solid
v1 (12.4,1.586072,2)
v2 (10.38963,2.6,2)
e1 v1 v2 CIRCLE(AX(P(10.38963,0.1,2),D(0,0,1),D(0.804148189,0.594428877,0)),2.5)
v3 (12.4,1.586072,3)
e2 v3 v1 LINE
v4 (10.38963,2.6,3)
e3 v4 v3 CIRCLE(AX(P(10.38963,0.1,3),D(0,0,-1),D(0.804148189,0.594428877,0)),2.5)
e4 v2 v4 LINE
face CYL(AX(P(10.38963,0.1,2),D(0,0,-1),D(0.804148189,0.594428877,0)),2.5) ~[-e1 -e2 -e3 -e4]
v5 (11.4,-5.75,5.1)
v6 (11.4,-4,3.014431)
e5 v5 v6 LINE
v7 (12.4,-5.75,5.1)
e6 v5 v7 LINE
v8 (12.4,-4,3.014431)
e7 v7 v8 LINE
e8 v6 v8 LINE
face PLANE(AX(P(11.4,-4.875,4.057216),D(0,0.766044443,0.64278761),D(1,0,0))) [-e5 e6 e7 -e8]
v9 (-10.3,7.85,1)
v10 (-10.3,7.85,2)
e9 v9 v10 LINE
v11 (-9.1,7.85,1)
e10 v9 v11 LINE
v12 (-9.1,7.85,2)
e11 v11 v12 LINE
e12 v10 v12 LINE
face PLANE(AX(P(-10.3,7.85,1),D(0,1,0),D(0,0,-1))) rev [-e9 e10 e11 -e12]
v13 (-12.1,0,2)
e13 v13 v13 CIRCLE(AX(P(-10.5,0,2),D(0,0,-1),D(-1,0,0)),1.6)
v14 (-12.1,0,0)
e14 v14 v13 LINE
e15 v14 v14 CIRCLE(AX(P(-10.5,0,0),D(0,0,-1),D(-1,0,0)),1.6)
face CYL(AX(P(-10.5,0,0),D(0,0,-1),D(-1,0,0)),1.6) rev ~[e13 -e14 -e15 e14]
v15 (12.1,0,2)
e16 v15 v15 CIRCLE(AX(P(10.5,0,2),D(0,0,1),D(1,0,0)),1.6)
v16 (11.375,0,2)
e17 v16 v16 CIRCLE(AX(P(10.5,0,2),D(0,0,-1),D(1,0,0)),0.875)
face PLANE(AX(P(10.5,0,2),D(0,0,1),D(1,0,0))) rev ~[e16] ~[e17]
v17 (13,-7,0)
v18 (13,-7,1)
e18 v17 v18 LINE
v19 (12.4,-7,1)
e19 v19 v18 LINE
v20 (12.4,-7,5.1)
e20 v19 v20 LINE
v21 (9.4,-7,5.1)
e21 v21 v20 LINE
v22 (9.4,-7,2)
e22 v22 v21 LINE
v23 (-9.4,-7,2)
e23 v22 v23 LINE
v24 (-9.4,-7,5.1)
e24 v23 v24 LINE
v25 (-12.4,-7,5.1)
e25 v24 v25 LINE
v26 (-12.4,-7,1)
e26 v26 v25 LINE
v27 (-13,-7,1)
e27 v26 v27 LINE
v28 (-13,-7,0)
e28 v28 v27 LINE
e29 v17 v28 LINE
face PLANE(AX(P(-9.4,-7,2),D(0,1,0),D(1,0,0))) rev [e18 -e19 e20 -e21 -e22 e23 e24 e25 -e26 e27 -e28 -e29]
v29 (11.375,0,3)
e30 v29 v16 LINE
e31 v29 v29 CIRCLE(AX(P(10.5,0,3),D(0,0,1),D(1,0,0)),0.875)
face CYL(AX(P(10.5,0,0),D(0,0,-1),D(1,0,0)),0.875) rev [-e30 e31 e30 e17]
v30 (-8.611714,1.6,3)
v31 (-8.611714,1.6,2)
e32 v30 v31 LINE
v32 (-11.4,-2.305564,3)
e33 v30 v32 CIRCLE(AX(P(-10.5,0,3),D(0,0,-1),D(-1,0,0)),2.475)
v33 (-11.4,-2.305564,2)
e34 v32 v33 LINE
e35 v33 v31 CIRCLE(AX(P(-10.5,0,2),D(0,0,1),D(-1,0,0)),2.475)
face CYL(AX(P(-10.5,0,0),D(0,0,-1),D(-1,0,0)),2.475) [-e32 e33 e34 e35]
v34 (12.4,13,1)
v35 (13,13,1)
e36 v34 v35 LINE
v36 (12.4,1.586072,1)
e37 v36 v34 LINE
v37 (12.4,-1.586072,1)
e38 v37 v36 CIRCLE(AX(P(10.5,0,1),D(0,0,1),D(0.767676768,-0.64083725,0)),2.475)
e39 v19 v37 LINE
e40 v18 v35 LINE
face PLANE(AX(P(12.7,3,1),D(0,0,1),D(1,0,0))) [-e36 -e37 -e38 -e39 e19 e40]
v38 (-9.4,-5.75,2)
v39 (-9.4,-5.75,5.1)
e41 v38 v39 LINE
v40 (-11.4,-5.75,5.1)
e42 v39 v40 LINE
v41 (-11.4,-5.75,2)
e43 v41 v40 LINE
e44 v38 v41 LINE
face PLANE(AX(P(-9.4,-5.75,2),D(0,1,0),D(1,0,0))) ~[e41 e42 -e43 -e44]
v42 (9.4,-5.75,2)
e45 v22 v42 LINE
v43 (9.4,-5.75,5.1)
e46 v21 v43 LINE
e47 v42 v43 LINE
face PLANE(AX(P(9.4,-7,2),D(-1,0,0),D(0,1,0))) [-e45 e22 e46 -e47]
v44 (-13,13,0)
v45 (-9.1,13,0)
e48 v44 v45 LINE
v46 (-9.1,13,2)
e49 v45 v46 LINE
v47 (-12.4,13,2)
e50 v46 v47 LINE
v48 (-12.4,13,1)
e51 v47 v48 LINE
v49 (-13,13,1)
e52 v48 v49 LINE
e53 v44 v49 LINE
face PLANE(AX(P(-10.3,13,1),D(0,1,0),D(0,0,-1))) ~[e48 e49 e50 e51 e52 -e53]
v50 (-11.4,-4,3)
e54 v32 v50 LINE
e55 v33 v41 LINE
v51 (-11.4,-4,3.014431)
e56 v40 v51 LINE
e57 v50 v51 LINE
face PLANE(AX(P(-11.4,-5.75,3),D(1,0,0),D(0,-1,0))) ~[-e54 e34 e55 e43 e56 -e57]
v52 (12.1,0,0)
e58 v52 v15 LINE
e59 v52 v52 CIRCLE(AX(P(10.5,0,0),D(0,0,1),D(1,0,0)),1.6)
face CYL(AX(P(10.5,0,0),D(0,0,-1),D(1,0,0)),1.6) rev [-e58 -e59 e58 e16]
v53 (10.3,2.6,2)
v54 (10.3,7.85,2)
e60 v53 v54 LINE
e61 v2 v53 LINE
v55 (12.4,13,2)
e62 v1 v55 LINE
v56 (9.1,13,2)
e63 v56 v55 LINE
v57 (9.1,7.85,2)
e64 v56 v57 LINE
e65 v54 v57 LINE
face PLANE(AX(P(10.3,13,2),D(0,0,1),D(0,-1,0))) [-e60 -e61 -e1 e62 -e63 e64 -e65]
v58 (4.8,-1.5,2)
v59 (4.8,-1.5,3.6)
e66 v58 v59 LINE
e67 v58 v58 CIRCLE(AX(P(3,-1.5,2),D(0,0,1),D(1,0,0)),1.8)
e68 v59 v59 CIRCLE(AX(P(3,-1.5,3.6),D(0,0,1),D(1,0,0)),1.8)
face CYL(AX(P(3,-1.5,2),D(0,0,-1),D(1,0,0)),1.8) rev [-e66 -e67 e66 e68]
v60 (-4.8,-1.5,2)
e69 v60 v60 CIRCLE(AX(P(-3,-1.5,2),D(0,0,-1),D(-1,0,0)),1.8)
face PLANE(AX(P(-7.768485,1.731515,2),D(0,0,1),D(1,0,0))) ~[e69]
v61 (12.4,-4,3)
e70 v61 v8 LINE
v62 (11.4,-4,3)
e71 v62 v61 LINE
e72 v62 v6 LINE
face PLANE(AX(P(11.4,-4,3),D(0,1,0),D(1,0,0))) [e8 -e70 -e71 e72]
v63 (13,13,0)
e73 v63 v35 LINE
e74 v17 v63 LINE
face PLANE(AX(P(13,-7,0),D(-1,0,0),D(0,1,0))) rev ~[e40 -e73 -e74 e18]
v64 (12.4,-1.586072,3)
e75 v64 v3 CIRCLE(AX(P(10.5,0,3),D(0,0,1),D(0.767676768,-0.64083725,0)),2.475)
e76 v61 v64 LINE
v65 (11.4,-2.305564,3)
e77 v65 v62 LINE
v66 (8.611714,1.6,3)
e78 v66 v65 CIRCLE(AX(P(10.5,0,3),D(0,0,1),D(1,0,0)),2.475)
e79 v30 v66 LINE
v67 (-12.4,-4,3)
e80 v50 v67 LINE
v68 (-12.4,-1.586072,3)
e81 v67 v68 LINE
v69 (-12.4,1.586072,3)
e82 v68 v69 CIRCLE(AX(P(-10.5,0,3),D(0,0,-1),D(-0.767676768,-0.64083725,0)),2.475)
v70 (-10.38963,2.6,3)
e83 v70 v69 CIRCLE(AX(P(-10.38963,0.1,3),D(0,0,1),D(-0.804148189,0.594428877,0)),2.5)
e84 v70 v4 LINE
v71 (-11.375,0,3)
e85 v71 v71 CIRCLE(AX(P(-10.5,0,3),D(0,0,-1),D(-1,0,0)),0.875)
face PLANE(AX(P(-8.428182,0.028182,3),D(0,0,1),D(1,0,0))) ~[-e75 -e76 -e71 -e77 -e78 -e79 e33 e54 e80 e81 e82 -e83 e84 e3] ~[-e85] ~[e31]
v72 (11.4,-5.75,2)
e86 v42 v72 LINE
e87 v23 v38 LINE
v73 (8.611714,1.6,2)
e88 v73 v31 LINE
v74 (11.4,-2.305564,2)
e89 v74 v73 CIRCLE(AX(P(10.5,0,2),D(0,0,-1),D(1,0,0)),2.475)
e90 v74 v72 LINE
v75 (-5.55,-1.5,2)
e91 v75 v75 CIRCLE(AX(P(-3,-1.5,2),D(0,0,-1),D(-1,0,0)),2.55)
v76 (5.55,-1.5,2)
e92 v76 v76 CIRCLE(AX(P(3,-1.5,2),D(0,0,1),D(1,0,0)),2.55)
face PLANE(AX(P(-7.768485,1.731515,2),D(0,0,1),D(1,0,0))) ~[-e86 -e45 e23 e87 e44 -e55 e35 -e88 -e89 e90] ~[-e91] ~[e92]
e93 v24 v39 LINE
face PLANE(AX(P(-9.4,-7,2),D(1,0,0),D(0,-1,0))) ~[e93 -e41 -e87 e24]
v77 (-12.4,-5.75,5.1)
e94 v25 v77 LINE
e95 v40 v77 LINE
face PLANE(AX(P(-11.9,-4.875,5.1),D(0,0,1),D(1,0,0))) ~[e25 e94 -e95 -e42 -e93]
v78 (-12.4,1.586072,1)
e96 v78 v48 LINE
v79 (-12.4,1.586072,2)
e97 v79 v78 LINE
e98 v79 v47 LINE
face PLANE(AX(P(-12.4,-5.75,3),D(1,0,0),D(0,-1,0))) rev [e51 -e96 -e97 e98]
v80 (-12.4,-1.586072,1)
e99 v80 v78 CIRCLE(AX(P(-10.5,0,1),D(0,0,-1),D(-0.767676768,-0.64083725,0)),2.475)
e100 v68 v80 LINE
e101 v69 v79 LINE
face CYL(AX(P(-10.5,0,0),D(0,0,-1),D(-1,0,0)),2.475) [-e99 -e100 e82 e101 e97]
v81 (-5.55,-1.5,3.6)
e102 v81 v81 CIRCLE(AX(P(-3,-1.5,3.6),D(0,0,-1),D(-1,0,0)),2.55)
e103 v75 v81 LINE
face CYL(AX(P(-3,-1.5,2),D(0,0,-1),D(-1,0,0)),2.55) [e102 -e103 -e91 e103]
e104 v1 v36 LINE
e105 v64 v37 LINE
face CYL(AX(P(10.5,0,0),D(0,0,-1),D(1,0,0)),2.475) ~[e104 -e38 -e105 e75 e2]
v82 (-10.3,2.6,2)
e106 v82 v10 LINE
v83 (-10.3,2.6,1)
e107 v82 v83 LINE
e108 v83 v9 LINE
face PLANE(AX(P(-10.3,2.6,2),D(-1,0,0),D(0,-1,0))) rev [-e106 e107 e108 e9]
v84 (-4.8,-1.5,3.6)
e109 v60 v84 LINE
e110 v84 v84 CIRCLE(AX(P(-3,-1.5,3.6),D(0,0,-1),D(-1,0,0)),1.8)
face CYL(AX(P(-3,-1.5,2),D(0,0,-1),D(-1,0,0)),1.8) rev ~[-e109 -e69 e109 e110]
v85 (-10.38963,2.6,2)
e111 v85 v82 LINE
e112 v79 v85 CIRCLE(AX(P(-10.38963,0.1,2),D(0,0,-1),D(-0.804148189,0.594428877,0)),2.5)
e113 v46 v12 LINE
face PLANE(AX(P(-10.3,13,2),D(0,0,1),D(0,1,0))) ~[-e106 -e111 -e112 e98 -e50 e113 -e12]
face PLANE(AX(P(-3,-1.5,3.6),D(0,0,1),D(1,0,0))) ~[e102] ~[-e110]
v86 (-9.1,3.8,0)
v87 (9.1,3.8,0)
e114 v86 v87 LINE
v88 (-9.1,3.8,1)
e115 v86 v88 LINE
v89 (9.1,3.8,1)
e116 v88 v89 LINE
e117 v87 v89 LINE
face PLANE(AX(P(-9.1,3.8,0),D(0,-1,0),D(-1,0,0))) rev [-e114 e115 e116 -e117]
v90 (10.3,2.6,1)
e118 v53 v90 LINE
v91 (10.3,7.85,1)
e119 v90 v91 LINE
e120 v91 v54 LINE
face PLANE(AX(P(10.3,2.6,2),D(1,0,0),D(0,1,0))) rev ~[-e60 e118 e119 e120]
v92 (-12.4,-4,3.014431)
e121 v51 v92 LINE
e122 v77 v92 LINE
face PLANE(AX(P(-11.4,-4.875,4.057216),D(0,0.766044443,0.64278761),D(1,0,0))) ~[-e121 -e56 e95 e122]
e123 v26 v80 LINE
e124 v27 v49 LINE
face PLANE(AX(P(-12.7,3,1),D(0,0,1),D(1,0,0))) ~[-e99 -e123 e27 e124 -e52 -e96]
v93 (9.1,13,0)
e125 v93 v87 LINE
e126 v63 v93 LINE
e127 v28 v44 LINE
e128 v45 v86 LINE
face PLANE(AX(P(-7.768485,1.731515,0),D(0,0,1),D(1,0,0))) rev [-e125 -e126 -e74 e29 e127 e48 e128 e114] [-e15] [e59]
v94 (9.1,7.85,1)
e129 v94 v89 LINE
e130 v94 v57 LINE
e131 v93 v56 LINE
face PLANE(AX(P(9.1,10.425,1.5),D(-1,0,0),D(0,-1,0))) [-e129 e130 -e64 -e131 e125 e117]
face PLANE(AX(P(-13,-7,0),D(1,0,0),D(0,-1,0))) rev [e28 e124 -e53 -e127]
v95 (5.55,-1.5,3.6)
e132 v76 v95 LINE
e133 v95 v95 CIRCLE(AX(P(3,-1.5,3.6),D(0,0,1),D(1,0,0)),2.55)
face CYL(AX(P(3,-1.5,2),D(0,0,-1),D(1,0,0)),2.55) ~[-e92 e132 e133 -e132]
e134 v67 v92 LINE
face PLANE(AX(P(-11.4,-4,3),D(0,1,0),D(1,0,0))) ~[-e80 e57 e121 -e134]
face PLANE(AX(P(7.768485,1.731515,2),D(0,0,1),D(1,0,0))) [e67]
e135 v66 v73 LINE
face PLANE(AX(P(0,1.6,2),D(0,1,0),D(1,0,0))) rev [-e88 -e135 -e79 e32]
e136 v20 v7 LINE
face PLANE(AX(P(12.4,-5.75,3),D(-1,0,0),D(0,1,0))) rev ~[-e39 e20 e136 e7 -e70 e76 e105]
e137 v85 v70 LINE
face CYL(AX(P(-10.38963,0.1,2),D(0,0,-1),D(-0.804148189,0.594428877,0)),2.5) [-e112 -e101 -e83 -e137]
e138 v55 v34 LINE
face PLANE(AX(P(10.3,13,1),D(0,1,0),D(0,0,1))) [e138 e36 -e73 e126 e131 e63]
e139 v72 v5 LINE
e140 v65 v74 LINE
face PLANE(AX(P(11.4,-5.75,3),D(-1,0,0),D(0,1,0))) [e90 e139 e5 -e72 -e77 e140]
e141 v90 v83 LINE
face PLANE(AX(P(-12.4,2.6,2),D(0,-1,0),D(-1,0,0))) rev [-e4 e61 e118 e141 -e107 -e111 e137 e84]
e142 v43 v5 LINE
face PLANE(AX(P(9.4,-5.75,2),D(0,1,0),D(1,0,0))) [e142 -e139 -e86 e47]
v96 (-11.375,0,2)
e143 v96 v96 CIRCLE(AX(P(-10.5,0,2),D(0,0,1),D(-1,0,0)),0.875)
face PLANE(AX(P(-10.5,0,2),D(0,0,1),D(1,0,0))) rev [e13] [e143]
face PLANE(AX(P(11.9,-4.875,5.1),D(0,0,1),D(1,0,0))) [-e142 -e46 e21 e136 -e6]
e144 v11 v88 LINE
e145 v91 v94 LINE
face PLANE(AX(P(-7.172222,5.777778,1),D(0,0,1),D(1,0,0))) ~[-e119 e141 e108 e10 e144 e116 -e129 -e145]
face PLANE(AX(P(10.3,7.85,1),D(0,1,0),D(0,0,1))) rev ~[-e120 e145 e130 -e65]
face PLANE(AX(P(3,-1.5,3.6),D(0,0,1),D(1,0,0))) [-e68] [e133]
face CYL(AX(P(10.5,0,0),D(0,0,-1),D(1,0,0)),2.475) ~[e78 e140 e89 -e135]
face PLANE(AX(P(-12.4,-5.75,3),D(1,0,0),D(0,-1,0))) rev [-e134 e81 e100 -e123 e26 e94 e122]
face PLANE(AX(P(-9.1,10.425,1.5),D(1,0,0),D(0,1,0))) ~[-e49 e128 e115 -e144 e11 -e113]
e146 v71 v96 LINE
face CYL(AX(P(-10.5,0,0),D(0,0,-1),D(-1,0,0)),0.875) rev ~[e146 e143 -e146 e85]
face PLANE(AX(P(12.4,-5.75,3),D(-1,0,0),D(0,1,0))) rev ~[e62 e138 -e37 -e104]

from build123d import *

# Parameters (mm, degrees)
F1_DEPTH     = 2
F2_W         = 0.6
F2_H         = 20
F3_DEPTH     = 1
F5_DEPTH     = 1
F6_W         = 3
F6_H         = 1.25
F7_DEPTH     = 3.1
F8_W         = 1
F8_H         = 1.75
F9_DEPTH     = 2.1
F10_SIZE2    = 2.085568787
F10_SIZE     = 1.75
F11_R        = 2.475
F11_R_2      = 0.875
F12_DEPTH    = 3
F13_T1_DEPTH = 6.0259261824
F14_R        = 0.875
F15_DEPTH    = 5.101
F17_DEPTH    = 1
F18_W        = 5.15
F18_H        = 1
F19_DEPTH    = 1.2
F20_R        = 1.6
F21_DEPTH    = 2
F22_R        = 2.55
F22_R_2      = 1.8
F23_DEPTH    = 1.6


# Not quite as in the source:
# - a fillet or chamfer that OpenCascade refuses, or shapes differently, is made with other operations: its cross-section is extruded or revolved along the edge and cut away or added


with BuildPart() as f1:
    # F0 (on Top) → F1 (new body)
    with BuildSketch(Plane.XY):
        Polygon((0, 3.8), (0, -7), (13, -7), (13, 13), (9.1, 13), (9.1, 3.8), align=None)
    extrude(amount=F1_DEPTH)

    # F2 (on face) → F3 (cut)
    with BuildSketch(Plane.XY.offset(2)):
        with Locations((12.7, 3)):
            Rectangle(F2_W, F2_H)
    extrude(amount=-F3_DEPTH, mode=Mode.SUBTRACT)

    # F4 (on face) → F5 (join)
    with BuildSketch(Plane.XY.offset(2)):
        Polygon((12.4, -7), (12.4, 2.6), (0, 2.6), (0, 1.6), (11.4, 1.6), (11.4, -7), align=None)
    extrude(amount=F5_DEPTH)

    # F6 (on face) → F7 (join)
    with BuildSketch(Plane.XY.offset(2)):
        with Locations((10.9, -6.375)):
            Rectangle(F6_W, F6_H)
    extrude(amount=F7_DEPTH)

    # F8 (on face) → F9 (join)
    with BuildSketch(Plane.XY.offset(3)):
        with Locations((11.9, -4.875)):
            Rectangle(F8_W, F8_H)
    extrude(amount=F9_DEPTH)

    # F10
    f10_edges = [f1.edges().sort_by_distance(p)[0] for p in [
        (11.9, -4, 5.1),
    ]]
    f10_side = f1.faces().sort_by_distance((11.218182, -5.897727, 5.1))[0]
    chamfer(f10_edges, length=F10_SIZE, length2=F10_SIZE2, reference=f10_side)

    # F11 (on Top) → F12 (join)
    with BuildSketch(Plane.XY):
        with Locations((10.5, 0)):
            Circle(F11_R)
        with Locations((10.5, 0)):
            Circle(F11_R_2, mode=Mode.SUBTRACT)
    extrude(amount=F12_DEPTH)

    # F13: fillet of radius 2.5 on 1 edges, made by hand

    # F13_s2 → F13_t1 (cut)
    with BuildSketch(Plane.XY.offset(2)):
        with BuildLine():
            ThreePointArc((12.4, 1.5860721926), (11.515422474, 2.3321716423), (10.389629527, 2.6))
            Line((10.389629527, 2.6), (12.4, 2.6))
            Line((12.4, 2.6), (12.4, 1.5860721926))
        make_face()
    extrude(amount=F13_T1_DEPTH, mode=Mode.SUBTRACT)

    # F14 (on face) → F15 (cut, through all)
    with BuildSketch(Plane.XY):
        with Locations((10.5, 0)):
            Circle(F14_R)
    extrude(amount=F15_DEPTH, mode=Mode.SUBTRACT)

    # F16 (on face) → F17 (cut)
    with BuildSketch(Plane.XY.offset(2)):
        Polygon((10.3, 13), (9.1, 13), (9.1, 3.8), (0, 3.8), (0, 2.6), (10.3, 2.6), align=None)
    extrude(amount=-F17_DEPTH, mode=Mode.SUBTRACT)

    # F18 (on face) → F19 (join)
    with BuildSketch(Plane(origin=(10.3, 0, 0), x_dir=(0, -1, 0), z_dir=(-1, 0, 0))):
        with Locations((-10.425, 1.5)):
            Rectangle(F18_W, F18_H)
    extrude(amount=F19_DEPTH)

    # F20 (on face) → F21 (cut)
    with BuildSketch(Plane.XY):
        with Locations((10.5, 0)):
            Circle(F20_R)
    extrude(amount=F21_DEPTH, mode=Mode.SUBTRACT)

    # F22 (on face) → F23 (join)
    with BuildSketch(Plane.XY.offset(2)):
        with Locations((3, -1.5)):
            Circle(F22_R)
        with Locations((3, -1.5)):
            Circle(F22_R_2, mode=Mode.SUBTRACT)
    extrude(amount=F23_DEPTH)

    # F24: F1 across face


with BuildPart() as f1_1:
    add(f1.part)
    add(f1.part.mirror(Plane(origin=(0, -1.6962616822, 1.0420560748), x_dir=(0, -1, 0), z_dir=(-1, 0, 0))))


solid = f1_1.part
